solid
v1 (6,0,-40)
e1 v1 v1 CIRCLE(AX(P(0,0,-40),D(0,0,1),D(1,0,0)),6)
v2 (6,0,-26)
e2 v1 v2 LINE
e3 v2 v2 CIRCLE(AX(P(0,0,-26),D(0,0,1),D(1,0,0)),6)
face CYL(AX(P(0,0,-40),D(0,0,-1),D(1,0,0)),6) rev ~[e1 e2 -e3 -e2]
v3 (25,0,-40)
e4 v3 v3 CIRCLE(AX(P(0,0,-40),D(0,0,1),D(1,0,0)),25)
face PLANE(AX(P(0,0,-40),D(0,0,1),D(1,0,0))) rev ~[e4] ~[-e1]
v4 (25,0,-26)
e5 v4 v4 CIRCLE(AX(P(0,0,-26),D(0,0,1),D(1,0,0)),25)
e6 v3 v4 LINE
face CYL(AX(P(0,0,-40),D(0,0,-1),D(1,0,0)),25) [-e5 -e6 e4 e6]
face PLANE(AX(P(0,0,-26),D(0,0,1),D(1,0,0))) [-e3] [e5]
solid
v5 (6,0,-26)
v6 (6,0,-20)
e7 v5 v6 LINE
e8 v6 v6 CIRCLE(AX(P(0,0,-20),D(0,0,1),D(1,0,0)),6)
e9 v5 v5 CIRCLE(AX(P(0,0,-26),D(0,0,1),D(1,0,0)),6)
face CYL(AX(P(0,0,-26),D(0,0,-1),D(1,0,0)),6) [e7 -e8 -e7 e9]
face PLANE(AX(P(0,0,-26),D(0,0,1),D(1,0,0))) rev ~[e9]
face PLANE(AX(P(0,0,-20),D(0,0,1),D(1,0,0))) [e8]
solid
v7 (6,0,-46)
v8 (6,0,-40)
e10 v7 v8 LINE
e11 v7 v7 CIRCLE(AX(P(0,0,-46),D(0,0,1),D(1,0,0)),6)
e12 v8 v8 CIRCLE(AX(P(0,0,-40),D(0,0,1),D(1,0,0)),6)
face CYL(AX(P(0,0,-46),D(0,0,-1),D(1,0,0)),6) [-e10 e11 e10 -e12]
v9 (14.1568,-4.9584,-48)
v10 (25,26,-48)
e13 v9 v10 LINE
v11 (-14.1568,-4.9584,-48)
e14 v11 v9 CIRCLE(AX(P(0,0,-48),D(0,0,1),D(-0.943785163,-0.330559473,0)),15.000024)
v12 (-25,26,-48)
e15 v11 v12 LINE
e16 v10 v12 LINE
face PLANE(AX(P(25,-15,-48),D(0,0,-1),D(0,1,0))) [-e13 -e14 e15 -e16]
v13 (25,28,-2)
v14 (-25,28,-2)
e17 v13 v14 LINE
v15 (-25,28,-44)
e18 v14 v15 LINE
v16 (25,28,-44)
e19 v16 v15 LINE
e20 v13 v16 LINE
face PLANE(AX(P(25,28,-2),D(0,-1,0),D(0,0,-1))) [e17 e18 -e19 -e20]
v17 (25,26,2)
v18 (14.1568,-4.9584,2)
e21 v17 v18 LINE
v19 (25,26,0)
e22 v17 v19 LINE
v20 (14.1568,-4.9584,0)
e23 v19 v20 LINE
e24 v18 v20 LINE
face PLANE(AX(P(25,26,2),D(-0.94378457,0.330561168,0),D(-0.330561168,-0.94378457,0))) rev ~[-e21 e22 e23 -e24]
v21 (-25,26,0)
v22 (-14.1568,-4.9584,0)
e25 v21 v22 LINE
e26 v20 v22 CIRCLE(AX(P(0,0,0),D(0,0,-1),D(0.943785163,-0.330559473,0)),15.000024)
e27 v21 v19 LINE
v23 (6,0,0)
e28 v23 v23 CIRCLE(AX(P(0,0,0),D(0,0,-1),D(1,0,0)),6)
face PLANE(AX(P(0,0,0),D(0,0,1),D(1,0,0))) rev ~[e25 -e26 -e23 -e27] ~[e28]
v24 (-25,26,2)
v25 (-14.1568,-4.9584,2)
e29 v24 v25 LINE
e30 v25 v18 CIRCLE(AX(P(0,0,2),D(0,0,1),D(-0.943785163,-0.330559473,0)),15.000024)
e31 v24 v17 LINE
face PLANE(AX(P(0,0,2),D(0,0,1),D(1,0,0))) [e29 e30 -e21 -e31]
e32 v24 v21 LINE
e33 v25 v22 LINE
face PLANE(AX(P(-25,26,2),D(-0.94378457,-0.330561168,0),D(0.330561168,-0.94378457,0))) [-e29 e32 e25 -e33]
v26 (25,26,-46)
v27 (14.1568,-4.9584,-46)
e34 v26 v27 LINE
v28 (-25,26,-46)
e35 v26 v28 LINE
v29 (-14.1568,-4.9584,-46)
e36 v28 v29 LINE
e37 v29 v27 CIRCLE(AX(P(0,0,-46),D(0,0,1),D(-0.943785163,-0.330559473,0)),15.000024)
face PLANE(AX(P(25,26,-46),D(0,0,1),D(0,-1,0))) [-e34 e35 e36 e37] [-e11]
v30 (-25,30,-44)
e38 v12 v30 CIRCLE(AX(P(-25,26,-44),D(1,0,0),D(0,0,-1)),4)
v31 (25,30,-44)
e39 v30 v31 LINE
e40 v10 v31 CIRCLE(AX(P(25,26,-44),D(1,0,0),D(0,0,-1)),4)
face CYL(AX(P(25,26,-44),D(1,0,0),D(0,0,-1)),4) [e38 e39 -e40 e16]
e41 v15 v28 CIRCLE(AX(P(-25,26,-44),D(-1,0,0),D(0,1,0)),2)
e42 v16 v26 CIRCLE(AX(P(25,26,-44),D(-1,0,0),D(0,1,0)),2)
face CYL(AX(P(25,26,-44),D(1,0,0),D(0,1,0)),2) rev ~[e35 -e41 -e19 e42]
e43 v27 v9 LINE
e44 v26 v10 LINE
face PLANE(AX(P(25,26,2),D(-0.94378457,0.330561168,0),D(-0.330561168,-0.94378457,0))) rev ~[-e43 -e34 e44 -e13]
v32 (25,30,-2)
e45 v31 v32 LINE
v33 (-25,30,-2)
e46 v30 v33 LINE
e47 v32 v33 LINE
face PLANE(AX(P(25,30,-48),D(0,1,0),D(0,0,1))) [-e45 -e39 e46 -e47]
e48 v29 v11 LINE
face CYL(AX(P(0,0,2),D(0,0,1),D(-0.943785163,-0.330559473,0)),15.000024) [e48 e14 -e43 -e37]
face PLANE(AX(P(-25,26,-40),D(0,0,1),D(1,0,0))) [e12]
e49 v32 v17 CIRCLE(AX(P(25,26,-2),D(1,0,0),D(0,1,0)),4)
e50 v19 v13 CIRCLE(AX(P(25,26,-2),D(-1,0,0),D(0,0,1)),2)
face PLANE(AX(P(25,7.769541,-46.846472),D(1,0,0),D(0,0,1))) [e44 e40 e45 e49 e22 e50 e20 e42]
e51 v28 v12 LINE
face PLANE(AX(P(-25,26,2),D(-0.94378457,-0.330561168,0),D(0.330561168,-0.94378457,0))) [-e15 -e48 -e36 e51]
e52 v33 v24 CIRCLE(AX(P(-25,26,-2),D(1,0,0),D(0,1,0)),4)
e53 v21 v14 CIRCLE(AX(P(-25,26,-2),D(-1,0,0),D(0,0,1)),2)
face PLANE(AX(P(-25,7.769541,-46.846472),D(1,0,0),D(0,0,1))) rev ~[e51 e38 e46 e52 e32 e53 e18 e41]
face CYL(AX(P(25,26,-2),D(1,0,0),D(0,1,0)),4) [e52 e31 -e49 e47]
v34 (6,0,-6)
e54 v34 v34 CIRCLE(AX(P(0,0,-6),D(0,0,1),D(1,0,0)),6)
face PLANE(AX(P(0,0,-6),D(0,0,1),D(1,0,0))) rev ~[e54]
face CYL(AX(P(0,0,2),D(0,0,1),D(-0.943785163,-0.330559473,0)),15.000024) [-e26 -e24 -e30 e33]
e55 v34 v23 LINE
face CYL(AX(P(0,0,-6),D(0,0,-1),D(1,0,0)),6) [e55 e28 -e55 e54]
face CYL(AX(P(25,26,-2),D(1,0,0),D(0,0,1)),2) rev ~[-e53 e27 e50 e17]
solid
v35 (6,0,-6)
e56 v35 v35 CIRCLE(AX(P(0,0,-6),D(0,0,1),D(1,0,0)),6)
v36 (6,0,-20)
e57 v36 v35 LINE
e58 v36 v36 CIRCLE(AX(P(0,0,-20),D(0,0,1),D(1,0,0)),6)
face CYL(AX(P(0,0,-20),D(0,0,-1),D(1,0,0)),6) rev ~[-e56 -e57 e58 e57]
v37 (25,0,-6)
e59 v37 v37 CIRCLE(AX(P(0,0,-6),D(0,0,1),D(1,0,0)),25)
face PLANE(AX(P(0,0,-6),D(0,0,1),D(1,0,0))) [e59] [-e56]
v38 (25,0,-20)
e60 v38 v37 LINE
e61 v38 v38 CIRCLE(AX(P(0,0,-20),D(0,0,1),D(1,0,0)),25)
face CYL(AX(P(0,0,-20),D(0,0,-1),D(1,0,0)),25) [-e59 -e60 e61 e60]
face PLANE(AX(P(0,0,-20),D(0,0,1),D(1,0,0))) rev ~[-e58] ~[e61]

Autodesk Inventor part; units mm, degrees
ref_plane "YZ Plane" through (0, 0, 0) normal (1, 0, 0) x (0, 1, 0)
ref_plane "XZ Plane" through (0, 0, 0) normal (0, 1, 0) x (-1, 0, 0)
ref_plane "XY Plane" through (0, 0, 0) normal (0, 0, 1) x (1, 0, 0)
sketch "Sketch3" plane through (0, 0, 0) normal (0, 0, 1) x (1, 0, 0)
  line L0 (-14.3279, -4.4399) -> (-25, 30)
  line L1 (-25, 30) -> (25, 30)
  line L2 (25, 30) -> (14.3279, -4.4399)
  circle A0 centre (0, 0) radius 15
  line L3 (-25, 30) -> (25, 30)
  line L4 (25, 30) -> (25, -15)
  line L5 (25, -15) -> (-25, -15)
  line L6 (-25, -15) -> (-25, 30)
  dimension "d0" = 50
  dimension "d1" = 30
  dimension "d2" = 30
  dimension "d24" = 50
extrude "Plate1" add sketch "Sketch3" along normal blind 2
sketch "Sketch8" plane through (25, 28, 2) normal (0, 1, 0) x (-1, 0, 0)
  line L0 (50, 0) -> (0, 0)
  line L1 (0, 0) -> (0, -50)
  line L2 (0, -50) -> (50, -50)
  line L3 (50, -50) -> (50, 0)
edge flange "Flange3" height 50 angle 90 thickness 2 bend radius 2 thickness toward (0, 1, 0) relief tear relief width 2 relief depth 1 edges at (0, 30, 0) wall of the first edge with corners at (-25, 28, 2) (25, 28, 2) (25, 28, -48) (-25, 28, -48)
bend "Bend5"
corner "Corner3"
sketch "Sketch9" plane through (25, 30, -46) normal (0, 0, -1) x (-1, 0, 0)
  line L0 (50, 0) -> (0, 0)
  line L1 (0, 0) -> (0, -45)
  line L2 (0, -45) -> (50, -45)
  line L3 (50, -45) -> (50, 0)
edge flange "Flange4" height 45 angle 90 thickness 2 bend radius 2 thickness toward (0, 0, -1) relief tear relief width 2 relief depth 1 edges at (0, 28, -48) wall of the first edge with corners at (-25, 30, -46) (25, 30, -46) (25, -15, -46) (-25, -15, -46)
bend "Bend6"
corner "Corner4"
sketch "Sketch11" plane through (0, 0, 2) normal (0, 0, 1) x (1, 0, 0)
  line L0 (25, 26) -> (-25, 26) projected
  line L1 (-25, -15) -> (-25, 26) projected
  line L2 (25, -15) -> (-25, -15) projected
  line L3 (25, 26) -> (25, -15) projected
  arc A0 (-14.1568, -4.9584) -> (14.1568, -4.9584) centre (0, 0) ccw
  line L4 (-25, 26) -> (-14.1568, -4.9584)
  line L5 (25, 26) -> (14.1568, -4.9584)
extrude "Cut2" cut sketch "Sketch11" against normal through all contours L3 L2 A0 L5 | L4 A0 L2 L1
sketch "Sketch12" plane through (-25, 26, -46) normal (0, 0, 1) x (1, 0, 0)
  arc A0 (10.8432, -30.9584) -> (39.1568, -30.9584) centre (25, -26) ccw projected
  circle A1 centre (25, -26) radius 6
  dimension "d59" = 12
extrude "Extrusion1" add sketch "Sketch12" along normal blind 6
sketch "Sketch13" plane through (0, 0, -40) normal (0, 0, 1) x (1, 0, 0)
  circle A0 centre (0, 0) radius 6 projected
  circle A1 centre (0, 0) radius 25
  dimension "d62" = 50
extrude "Extrusion2" add sketch "Sketch13" along normal blind 14
sketch "Sketch14" plane through (0, 0, -26) normal (0, 0, 1) x (1, 0, 0)
  circle A0 centre (0, 0) radius 6 projected
extrude "Extrusion3" add sketch "Sketch14" along normal blind 6
sketch "Sketch15" plane through (0, 0, -20) normal (0, 0, 1) x (1, 0, 0)
  circle A0 centre (0, 0) radius 6 projected
  circle A1 centre (0, 0) radius 6 projected
  circle A2 centre (0, 0) radius 25 projected
extrude "Extrusion4" add sketch "Sketch15" along normal blind 14
sketch "Sketch16" plane through (0, 0, -6) normal (0, 0, 1) x (1, 0, 0)
  circle A0 centre (0, 0) radius 6 projected
extrude "Extrusion5" add sketch "Sketch16" along normal up to next
equation "\"d57\" = Thickness"
equation "\"d35\" = BendReliefWidth"
equation "\"d36\" = BendReliefDepth"
equation "\"d37\" = MinimumRemnant"
equation "\"d38\" = BendRadius"
equation "\"d41\" = BendRadius"
equation "\"d42\" = CornerReliefSize"
equation "\"d43\" = GapSize"
equation "\"d44\" = JacobiRadiusSize"
equation "\"d45\" = BendReliefWidth"
equation "\"d46\" = BendReliefDepth"
equation "\"d47\" = MinimumRemnant"
equation "\"d48\" = BendRadius"
equation "\"d51\" = BendRadius"
equation "\"d52\" = CornerReliefSize"
equation "\"d53\" = GapSize"
equation "\"d54\" = JacobiRadiusSize"
equation "\"BendRadius\" = Thickness"
equation "\"BendReliefWidth\" = Thickness"
equation "\"BendReliefDepth\" = 0.5 * Thickness"
equation "\"CornerReliefSize\" = 4 * Thickness"
equation "\"MinimumRemnant\" = 2 * Thickness"
equation "\"TransitionRadius\" = BendRadius"
equation "\"JacobiRadiusSize\" = BendRadius"
equation "\"GapSize\" = Thickness"
equation "\"d3\" = BendRadius"
equation "\"Thickness\" = 2"
properties part number "wheel"
